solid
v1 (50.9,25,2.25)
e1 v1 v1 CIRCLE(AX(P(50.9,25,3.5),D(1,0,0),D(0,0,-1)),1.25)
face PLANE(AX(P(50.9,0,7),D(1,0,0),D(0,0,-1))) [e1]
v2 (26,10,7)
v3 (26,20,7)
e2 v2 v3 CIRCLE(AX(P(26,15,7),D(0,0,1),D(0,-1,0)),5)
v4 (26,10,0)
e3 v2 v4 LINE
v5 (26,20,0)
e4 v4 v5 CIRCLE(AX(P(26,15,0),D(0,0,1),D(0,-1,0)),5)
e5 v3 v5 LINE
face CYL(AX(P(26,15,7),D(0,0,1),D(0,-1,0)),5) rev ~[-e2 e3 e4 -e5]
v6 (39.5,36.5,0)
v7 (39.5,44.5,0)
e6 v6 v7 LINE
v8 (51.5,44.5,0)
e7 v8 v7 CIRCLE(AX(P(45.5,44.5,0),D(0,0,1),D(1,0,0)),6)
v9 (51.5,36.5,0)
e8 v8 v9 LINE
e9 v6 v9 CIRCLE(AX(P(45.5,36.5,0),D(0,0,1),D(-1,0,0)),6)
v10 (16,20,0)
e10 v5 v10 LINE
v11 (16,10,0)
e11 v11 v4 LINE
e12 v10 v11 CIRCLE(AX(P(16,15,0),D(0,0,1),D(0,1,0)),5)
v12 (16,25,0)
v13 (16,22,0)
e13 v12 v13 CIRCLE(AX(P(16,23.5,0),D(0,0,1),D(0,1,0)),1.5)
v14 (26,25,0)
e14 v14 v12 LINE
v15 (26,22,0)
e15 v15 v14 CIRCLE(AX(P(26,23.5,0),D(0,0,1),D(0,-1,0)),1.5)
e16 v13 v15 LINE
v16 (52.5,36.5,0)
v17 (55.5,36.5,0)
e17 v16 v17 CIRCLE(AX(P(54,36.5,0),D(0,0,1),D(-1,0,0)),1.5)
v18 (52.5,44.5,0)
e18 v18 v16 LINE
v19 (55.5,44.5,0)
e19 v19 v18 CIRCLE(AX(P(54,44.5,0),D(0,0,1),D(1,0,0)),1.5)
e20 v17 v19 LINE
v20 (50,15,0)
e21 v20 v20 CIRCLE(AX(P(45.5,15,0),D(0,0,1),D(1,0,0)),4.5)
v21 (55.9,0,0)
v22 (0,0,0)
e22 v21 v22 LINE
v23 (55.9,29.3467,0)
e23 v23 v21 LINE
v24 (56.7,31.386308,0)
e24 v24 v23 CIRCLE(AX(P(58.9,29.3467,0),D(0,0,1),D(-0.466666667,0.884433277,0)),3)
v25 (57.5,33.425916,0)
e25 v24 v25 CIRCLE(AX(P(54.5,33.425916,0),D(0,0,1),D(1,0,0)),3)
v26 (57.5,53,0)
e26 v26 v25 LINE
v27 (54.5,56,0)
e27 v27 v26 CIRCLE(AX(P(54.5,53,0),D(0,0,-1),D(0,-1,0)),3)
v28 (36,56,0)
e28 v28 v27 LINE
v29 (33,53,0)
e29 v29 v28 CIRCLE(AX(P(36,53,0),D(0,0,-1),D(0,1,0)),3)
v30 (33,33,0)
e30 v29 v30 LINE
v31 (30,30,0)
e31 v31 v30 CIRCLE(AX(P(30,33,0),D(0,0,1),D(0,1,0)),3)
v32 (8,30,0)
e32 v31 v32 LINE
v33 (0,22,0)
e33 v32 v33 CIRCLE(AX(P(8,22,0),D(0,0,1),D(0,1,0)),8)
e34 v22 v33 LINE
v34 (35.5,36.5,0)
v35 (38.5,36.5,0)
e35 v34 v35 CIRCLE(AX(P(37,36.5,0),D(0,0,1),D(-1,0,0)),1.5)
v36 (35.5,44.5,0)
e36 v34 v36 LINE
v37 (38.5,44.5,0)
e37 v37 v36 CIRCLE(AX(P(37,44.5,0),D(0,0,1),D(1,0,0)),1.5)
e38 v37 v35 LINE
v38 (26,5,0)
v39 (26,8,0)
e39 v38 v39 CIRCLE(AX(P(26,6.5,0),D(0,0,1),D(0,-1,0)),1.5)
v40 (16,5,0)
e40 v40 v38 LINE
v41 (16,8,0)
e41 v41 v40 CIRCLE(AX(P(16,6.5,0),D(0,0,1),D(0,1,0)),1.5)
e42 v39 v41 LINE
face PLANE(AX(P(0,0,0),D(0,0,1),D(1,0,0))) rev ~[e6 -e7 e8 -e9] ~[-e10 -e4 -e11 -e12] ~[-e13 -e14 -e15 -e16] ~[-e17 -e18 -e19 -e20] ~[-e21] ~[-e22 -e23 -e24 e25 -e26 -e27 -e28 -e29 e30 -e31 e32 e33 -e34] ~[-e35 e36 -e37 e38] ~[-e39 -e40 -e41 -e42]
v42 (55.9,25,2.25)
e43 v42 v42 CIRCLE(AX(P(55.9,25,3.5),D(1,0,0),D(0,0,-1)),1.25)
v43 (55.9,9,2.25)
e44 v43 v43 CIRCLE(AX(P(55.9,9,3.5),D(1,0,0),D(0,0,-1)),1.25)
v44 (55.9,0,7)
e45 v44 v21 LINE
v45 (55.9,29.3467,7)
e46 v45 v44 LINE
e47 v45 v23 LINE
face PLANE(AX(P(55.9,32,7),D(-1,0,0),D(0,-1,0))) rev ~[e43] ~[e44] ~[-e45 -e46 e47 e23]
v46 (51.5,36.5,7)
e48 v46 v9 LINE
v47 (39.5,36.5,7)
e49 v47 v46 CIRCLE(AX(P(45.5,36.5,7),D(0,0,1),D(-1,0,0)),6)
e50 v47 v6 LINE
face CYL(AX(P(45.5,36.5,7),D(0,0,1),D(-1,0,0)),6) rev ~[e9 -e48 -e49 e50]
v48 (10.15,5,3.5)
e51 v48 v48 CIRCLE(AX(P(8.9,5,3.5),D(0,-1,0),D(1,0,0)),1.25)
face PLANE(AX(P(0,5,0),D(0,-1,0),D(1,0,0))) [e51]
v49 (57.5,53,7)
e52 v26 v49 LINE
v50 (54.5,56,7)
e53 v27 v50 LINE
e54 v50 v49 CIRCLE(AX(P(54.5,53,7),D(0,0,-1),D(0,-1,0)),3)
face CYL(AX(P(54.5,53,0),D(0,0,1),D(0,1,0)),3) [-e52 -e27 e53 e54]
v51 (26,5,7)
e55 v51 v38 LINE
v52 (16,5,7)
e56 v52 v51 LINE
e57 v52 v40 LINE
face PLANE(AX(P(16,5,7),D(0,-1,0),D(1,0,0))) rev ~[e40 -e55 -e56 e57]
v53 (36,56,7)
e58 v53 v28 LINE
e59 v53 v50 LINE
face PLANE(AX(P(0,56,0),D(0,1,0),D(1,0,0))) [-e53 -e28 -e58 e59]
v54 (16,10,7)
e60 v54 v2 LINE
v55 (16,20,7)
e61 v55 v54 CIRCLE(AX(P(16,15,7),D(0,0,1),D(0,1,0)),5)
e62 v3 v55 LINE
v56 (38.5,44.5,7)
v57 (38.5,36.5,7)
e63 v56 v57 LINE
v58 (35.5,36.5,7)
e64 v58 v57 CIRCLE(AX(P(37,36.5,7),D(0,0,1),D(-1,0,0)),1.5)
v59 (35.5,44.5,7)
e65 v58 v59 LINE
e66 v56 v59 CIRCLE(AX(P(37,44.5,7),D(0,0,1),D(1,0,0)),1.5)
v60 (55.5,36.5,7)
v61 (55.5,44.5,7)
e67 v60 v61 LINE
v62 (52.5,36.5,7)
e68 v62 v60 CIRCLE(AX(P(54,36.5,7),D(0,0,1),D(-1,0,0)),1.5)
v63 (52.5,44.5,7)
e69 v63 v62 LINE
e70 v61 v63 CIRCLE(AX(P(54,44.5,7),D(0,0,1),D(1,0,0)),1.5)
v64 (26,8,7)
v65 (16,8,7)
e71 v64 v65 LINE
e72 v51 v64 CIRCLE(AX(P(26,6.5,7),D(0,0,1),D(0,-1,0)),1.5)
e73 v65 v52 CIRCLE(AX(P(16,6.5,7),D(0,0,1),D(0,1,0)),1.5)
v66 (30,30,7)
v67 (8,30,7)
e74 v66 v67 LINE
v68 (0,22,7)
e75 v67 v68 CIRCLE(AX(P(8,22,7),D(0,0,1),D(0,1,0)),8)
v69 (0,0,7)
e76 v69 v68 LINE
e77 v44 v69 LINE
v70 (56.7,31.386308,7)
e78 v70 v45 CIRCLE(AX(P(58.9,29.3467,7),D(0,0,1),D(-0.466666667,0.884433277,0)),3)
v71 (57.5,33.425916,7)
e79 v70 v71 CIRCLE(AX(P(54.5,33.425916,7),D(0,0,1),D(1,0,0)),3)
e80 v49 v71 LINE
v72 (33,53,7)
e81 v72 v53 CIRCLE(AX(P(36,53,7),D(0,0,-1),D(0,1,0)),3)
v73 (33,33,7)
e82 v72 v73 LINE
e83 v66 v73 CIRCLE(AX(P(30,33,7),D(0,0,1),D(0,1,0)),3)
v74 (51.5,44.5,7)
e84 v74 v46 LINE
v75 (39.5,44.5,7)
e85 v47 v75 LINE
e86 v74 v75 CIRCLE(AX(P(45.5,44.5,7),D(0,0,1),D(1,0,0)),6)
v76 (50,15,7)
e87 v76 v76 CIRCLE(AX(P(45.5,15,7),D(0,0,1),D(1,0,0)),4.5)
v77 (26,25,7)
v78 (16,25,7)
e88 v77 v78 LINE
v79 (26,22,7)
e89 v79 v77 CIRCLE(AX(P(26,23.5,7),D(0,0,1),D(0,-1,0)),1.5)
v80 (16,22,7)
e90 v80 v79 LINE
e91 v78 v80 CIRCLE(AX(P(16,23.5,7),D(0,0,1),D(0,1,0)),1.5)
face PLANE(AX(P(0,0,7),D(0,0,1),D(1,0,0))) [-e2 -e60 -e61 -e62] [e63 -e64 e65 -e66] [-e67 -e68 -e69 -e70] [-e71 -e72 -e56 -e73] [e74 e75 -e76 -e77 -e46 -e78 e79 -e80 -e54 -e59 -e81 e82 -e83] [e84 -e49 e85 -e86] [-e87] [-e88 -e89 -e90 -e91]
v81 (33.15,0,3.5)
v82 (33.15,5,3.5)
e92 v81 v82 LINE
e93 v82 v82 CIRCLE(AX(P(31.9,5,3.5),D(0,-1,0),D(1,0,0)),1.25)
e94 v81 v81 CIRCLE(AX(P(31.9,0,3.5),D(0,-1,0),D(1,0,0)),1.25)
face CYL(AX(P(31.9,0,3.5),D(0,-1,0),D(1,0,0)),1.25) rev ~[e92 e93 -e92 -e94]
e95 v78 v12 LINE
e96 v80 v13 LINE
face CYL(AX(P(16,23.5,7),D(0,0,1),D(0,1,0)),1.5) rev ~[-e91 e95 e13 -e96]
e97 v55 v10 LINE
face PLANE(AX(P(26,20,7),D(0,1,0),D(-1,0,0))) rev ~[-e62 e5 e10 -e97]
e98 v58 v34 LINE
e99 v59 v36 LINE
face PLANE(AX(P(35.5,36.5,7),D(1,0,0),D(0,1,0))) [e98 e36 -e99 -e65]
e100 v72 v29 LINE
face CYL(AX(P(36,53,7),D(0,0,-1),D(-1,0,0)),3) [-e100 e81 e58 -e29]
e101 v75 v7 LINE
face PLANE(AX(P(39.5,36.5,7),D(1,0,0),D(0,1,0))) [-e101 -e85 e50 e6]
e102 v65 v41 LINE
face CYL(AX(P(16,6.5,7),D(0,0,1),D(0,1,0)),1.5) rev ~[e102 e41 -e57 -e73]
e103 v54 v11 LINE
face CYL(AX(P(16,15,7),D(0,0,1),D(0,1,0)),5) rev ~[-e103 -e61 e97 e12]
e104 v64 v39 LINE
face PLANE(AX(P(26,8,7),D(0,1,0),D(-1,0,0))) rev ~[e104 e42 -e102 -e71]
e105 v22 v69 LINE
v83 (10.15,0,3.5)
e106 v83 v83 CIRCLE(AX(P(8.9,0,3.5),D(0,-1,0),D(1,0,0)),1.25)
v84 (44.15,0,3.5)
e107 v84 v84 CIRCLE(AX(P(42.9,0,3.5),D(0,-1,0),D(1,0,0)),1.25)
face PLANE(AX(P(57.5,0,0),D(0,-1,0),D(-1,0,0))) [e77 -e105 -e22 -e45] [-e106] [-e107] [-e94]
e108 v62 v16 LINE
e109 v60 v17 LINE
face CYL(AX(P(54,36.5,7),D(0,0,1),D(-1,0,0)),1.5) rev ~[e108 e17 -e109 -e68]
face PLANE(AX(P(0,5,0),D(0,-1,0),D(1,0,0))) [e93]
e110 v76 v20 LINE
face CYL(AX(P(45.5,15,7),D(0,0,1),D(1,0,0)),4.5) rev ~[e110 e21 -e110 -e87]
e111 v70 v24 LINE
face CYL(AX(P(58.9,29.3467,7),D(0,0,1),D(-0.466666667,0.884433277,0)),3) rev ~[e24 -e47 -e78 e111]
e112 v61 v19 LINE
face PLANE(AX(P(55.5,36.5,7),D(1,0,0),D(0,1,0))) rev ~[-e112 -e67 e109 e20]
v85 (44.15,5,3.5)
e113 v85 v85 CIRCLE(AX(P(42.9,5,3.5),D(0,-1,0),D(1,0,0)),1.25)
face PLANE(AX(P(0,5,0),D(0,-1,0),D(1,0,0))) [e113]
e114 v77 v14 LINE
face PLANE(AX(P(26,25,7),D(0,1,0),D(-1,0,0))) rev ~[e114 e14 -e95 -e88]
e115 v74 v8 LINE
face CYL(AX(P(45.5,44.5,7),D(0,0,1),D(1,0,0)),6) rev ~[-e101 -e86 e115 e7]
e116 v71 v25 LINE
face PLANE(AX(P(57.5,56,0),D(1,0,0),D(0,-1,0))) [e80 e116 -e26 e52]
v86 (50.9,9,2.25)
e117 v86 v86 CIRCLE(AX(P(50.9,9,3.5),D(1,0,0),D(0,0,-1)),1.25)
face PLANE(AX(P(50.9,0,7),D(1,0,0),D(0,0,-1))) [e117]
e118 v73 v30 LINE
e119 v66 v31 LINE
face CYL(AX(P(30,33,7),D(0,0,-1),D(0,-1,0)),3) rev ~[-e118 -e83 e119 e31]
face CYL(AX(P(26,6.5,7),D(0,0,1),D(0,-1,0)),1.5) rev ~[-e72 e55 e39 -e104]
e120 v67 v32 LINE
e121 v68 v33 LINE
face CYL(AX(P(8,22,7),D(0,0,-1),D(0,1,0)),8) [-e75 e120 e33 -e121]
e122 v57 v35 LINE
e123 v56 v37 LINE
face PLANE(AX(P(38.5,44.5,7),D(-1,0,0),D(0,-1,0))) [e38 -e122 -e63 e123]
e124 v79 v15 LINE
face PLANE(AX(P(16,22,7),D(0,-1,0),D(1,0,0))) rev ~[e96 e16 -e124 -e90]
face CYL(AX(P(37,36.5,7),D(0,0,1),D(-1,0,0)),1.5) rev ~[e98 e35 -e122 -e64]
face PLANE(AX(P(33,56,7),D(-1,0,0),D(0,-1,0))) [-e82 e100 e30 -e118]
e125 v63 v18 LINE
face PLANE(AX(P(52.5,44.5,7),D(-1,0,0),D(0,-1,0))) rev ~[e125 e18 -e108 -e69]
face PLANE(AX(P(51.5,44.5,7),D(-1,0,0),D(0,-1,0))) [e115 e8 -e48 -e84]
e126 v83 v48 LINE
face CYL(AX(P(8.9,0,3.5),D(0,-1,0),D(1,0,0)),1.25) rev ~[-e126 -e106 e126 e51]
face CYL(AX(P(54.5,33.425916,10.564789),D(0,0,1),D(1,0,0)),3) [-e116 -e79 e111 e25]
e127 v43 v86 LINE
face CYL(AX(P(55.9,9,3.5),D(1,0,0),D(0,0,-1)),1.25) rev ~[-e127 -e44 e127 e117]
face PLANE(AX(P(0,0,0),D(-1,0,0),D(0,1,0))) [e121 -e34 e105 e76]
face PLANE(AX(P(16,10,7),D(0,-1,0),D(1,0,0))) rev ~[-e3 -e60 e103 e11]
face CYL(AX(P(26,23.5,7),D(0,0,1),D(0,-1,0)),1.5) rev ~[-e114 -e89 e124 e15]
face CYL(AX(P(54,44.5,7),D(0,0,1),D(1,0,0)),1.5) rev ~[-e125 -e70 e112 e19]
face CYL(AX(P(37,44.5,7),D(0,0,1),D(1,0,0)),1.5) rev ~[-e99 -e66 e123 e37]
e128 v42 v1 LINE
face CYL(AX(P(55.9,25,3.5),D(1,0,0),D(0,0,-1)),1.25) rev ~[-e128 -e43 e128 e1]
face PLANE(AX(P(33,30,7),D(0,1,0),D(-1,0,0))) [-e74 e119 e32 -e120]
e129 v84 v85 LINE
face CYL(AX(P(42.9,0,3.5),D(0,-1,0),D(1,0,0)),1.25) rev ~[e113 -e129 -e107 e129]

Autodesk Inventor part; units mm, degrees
ref_plane "YZ Plane" through (0, 0, 0) normal (1, 0, 0) x (0, 1, 0)
ref_plane "XZ Plane" through (0, 0, 0) normal (0, 1, 0) x (-1, 0, 0)
ref_plane "XY Plane" through (0, 0, 0) normal (0, 0, 1) x (1, 0, 0)
sketch "Esquisse1" plane through (0, 0, 0) normal (0, 0, 1) x (1, 0, 0)
  point P0 (0, 0)
sketch "Esquisse2" plane through (0, 0, 0) normal (0, 0, 1) x (1, 0, 0)
  line L0 (0, 56) -> (57.5, 56)
  line L1 (57.5, 56) -> (57.5, 0)
  line L2 (57.5, 0) -> (0, 0)
  line L3 (0, 0) -> (0, 56)
  dimension "d0" = 57.5
  dimension "d1" = 56
extrude "Extrusion1" add sketch "Esquisse2" along normal blind 7
sketch "Esquisse3" plane through (0, 0, 7) normal (0, 0, 1) x (1, 0, 0)
  line L0 (57.5, 56) -> (0, 56) projected
  line L1 (0, 56) -> (33, 56)
  line L2 (33, 56) -> (33, 30)
  line L3 (33, 30) -> (0, 30)
  line L4 (0, 30) -> (0, 56)
  line L5 (0, 0) -> (57.5, 0) projected
  line L6 (57.5, 0) -> (57.5, 56) projected
  dimension "d5" = 30
  dimension "d6" = 24.5
extrude "Extrusion2" cut sketch "Esquisse3" against normal through all
sketch "Esquisse4" plane through (0, 0, 7) normal (0, 0, 1) x (1, 0, 0)
  circle A0 centre (45.5, 15) radius 4.5
  line L0 (16, 15) -> (26, 15) construction
  line L1 (16, 10) -> (26, 10)
  line L2 (26, 20) -> (16, 20)
  arc A1 (16, 20) -> (16, 10) centre (16, 15) ccw
  arc A2 (26, 10) -> (26, 20) centre (26, 15) ccw
  line L3 (16, 23.5) -> (26, 23.5) construction
  line L4 (16, 22) -> (26, 22)
  line L5 (26, 25) -> (16, 25)
  arc A3 (16, 25) -> (16, 22) centre (16, 23.5) ccw
  arc A4 (26, 22) -> (26, 25) centre (26, 23.5) ccw
  line L6 (16, 6.5) -> (26, 6.5) construction
  line L7 (16, 5) -> (26, 5)
  line L8 (26, 8) -> (16, 8)
  arc A5 (16, 8) -> (16, 5) centre (16, 6.5) ccw
  arc A6 (26, 5) -> (26, 8) centre (26, 6.5) ccw
  line L9 (45.5, 44.5) -> (45.5, 36.5) construction
  line L10 (51.5, 44.5) -> (51.5, 36.5)
  line L11 (39.5, 36.5) -> (39.5, 44.5)
  arc A7 (51.5, 44.5) -> (39.5, 44.5) centre (45.5, 44.5) ccw
  arc A8 (39.5, 36.5) -> (51.5, 36.5) centre (45.5, 36.5) ccw
  line L12 (37, 44.5) -> (37, 36.5) construction
  line L13 (38.5, 44.5) -> (38.5, 36.5)
  line L14 (35.5, 36.5) -> (35.5, 44.5)
  arc A9 (38.5, 44.5) -> (35.5, 44.5) centre (37, 44.5) ccw
  arc A10 (35.5, 36.5) -> (38.5, 36.5) centre (37, 36.5) ccw
  line L15 (54, 44.5) -> (54, 36.5) construction
  line L16 (52.5, 44.5) -> (52.5, 36.5)
  line L17 (55.5, 36.5) -> (55.5, 44.5)
  arc A11 (55.5, 44.5) -> (52.5, 44.5) centre (54, 44.5) ccw
  arc A12 (52.5, 36.5) -> (55.5, 36.5) centre (54, 36.5) ccw
  line L18 (0, 0) -> (57.5, 0) projected
  line L19 (57.5, 0) -> (57.5, 56) projected
  line L20 (33, 56) -> (33, 30) projected
  line L21 (57.5, 56) -> (33, 56) projected
  line L22 (0, 30) -> (0, 0) projected
  point P0 (21, 15)
  point P1 (21, 23.5)
  point P2 (21, 6.5)
  point P3 (45.5, 40.5)
  point P4 (37, 40.5)
  point P5 (54, 40.5)
  dimension "d9" = 12
  dimension "d10" = 3
  dimension "d11" = 3
  dimension "d12" = 3
  dimension "d13" = 3
  dimension "d14" = 10
  dimension "d15" = 9
  dimension "d19" = 13
  dimension "d20" = 13
  dimension "d21" = 20
  dimension "d22" = 20
  dimension "d23" = 11
  dimension "d24" = 11
  dimension "d25" = 1
  dimension "d26" = 1
  dimension "d27" = 2
  dimension "d28" = 2
  dimension "d30" = 15
  dimension "d31" = 12
  dimension "d32" = 5
  dimension "d33" = 2.5
  dimension "d34" = 5.5
  dimension "d37" = 16
  dimension "d38" = 0
  dimension "d39" = 0
  dimension "d40" = 0
  dimension "d41" = 0
extrude "Extrusion3" cut sketch "Esquisse4" against normal through all
fillet "Congé1" radius 8 1 edges at (0, 30, 3.5)
fillet "Congé2" radius 3 3 edges at (33, 56, 3.5) (57.5, 56, 3.5) (33, 30, 3.5)
sketch "Esquisse5" plane through (0, 0, 7) normal (0, 0, 1) x (1, 0, 0)
  line L0 (57.5, 32) -> (55.9, 32)
  line L1 (55.9, 32) -> (55.9, 0)
  line L2 (55.9, 0) -> (57.5, 0)
  line L3 (57.5, 0) -> (57.5, 32)
  line L4 (57.5, 0) -> (57.5, 53) projected
  line L5 (0, 0) -> (57.5, 0) projected
  dimension "d46" = 1.6
  dimension "d47" = 32
extrude "Extrusion4" cut sketch "Esquisse5" against normal through all
fillet "Congé3" radius 3 2 edges at (55.9, 32, 3.5) (57.5, 32, 3.5)
sketch "Esquisse6" plane through (55.9, 0, 7) normal (1, 0, 0) x (0, 0, -1)
  circle A0 centre (3.5, 9) radius 1.25
  circle A1 centre (3.5, 25) radius 1.25
  line L0 (7, 29.3467) -> (7, 0) projected
  line L1 (7, 0) -> (0, 0) projected
  dimension "d51" = 2.5
  dimension "d52" = 2.5
  dimension "d53" = 3.5
  dimension "d54" = 3.5
  dimension "d55" = 16
  dimension "d56" = 9
extrude "Extrusion5" cut sketch "Esquisse6" against normal blind 5
sketch "Esquisse7" plane through (0, 0, 0) normal (0, -1, 0) x (1, 0, 0)
  circle A0 centre (8.9, 3.5) radius 1.25
  circle A1 centre (31.9, 3.5) radius 1.25
  circle A2 centre (42.9, 3.5) radius 1.25
  line L0 (55.9, 0) -> (0, 0) projected
  line L1 (57.5, 0) -> (57.5, 7) projected
  line L2 (0, 0) -> (0, 7) projected
  line L3 (55.9, 0) -> (55.9, 7) projected
  dimension "d59" = 2.5
  dimension "d60" = 2.5
  dimension "d61" = 2.5
  dimension "d62" = 3.5
  dimension "d63" = 3.5
  dimension "d64" = 3.5
  dimension "d65" = 11
  dimension "d70" = 13
  dimension "d71" = 23
extrude "Extrusion6" cut sketch "Esquisse7" against normal blind 5
equation "\"d52\" = d51"
equation "\"d54\" = d53"
equation "\"d60\" = d59"
equation "\"d61\" = d59"
equation "\"d63\" = d62"
equation "\"d64\" = d62"
properties part number "SupportMoteur" material "Plastique ABS"
